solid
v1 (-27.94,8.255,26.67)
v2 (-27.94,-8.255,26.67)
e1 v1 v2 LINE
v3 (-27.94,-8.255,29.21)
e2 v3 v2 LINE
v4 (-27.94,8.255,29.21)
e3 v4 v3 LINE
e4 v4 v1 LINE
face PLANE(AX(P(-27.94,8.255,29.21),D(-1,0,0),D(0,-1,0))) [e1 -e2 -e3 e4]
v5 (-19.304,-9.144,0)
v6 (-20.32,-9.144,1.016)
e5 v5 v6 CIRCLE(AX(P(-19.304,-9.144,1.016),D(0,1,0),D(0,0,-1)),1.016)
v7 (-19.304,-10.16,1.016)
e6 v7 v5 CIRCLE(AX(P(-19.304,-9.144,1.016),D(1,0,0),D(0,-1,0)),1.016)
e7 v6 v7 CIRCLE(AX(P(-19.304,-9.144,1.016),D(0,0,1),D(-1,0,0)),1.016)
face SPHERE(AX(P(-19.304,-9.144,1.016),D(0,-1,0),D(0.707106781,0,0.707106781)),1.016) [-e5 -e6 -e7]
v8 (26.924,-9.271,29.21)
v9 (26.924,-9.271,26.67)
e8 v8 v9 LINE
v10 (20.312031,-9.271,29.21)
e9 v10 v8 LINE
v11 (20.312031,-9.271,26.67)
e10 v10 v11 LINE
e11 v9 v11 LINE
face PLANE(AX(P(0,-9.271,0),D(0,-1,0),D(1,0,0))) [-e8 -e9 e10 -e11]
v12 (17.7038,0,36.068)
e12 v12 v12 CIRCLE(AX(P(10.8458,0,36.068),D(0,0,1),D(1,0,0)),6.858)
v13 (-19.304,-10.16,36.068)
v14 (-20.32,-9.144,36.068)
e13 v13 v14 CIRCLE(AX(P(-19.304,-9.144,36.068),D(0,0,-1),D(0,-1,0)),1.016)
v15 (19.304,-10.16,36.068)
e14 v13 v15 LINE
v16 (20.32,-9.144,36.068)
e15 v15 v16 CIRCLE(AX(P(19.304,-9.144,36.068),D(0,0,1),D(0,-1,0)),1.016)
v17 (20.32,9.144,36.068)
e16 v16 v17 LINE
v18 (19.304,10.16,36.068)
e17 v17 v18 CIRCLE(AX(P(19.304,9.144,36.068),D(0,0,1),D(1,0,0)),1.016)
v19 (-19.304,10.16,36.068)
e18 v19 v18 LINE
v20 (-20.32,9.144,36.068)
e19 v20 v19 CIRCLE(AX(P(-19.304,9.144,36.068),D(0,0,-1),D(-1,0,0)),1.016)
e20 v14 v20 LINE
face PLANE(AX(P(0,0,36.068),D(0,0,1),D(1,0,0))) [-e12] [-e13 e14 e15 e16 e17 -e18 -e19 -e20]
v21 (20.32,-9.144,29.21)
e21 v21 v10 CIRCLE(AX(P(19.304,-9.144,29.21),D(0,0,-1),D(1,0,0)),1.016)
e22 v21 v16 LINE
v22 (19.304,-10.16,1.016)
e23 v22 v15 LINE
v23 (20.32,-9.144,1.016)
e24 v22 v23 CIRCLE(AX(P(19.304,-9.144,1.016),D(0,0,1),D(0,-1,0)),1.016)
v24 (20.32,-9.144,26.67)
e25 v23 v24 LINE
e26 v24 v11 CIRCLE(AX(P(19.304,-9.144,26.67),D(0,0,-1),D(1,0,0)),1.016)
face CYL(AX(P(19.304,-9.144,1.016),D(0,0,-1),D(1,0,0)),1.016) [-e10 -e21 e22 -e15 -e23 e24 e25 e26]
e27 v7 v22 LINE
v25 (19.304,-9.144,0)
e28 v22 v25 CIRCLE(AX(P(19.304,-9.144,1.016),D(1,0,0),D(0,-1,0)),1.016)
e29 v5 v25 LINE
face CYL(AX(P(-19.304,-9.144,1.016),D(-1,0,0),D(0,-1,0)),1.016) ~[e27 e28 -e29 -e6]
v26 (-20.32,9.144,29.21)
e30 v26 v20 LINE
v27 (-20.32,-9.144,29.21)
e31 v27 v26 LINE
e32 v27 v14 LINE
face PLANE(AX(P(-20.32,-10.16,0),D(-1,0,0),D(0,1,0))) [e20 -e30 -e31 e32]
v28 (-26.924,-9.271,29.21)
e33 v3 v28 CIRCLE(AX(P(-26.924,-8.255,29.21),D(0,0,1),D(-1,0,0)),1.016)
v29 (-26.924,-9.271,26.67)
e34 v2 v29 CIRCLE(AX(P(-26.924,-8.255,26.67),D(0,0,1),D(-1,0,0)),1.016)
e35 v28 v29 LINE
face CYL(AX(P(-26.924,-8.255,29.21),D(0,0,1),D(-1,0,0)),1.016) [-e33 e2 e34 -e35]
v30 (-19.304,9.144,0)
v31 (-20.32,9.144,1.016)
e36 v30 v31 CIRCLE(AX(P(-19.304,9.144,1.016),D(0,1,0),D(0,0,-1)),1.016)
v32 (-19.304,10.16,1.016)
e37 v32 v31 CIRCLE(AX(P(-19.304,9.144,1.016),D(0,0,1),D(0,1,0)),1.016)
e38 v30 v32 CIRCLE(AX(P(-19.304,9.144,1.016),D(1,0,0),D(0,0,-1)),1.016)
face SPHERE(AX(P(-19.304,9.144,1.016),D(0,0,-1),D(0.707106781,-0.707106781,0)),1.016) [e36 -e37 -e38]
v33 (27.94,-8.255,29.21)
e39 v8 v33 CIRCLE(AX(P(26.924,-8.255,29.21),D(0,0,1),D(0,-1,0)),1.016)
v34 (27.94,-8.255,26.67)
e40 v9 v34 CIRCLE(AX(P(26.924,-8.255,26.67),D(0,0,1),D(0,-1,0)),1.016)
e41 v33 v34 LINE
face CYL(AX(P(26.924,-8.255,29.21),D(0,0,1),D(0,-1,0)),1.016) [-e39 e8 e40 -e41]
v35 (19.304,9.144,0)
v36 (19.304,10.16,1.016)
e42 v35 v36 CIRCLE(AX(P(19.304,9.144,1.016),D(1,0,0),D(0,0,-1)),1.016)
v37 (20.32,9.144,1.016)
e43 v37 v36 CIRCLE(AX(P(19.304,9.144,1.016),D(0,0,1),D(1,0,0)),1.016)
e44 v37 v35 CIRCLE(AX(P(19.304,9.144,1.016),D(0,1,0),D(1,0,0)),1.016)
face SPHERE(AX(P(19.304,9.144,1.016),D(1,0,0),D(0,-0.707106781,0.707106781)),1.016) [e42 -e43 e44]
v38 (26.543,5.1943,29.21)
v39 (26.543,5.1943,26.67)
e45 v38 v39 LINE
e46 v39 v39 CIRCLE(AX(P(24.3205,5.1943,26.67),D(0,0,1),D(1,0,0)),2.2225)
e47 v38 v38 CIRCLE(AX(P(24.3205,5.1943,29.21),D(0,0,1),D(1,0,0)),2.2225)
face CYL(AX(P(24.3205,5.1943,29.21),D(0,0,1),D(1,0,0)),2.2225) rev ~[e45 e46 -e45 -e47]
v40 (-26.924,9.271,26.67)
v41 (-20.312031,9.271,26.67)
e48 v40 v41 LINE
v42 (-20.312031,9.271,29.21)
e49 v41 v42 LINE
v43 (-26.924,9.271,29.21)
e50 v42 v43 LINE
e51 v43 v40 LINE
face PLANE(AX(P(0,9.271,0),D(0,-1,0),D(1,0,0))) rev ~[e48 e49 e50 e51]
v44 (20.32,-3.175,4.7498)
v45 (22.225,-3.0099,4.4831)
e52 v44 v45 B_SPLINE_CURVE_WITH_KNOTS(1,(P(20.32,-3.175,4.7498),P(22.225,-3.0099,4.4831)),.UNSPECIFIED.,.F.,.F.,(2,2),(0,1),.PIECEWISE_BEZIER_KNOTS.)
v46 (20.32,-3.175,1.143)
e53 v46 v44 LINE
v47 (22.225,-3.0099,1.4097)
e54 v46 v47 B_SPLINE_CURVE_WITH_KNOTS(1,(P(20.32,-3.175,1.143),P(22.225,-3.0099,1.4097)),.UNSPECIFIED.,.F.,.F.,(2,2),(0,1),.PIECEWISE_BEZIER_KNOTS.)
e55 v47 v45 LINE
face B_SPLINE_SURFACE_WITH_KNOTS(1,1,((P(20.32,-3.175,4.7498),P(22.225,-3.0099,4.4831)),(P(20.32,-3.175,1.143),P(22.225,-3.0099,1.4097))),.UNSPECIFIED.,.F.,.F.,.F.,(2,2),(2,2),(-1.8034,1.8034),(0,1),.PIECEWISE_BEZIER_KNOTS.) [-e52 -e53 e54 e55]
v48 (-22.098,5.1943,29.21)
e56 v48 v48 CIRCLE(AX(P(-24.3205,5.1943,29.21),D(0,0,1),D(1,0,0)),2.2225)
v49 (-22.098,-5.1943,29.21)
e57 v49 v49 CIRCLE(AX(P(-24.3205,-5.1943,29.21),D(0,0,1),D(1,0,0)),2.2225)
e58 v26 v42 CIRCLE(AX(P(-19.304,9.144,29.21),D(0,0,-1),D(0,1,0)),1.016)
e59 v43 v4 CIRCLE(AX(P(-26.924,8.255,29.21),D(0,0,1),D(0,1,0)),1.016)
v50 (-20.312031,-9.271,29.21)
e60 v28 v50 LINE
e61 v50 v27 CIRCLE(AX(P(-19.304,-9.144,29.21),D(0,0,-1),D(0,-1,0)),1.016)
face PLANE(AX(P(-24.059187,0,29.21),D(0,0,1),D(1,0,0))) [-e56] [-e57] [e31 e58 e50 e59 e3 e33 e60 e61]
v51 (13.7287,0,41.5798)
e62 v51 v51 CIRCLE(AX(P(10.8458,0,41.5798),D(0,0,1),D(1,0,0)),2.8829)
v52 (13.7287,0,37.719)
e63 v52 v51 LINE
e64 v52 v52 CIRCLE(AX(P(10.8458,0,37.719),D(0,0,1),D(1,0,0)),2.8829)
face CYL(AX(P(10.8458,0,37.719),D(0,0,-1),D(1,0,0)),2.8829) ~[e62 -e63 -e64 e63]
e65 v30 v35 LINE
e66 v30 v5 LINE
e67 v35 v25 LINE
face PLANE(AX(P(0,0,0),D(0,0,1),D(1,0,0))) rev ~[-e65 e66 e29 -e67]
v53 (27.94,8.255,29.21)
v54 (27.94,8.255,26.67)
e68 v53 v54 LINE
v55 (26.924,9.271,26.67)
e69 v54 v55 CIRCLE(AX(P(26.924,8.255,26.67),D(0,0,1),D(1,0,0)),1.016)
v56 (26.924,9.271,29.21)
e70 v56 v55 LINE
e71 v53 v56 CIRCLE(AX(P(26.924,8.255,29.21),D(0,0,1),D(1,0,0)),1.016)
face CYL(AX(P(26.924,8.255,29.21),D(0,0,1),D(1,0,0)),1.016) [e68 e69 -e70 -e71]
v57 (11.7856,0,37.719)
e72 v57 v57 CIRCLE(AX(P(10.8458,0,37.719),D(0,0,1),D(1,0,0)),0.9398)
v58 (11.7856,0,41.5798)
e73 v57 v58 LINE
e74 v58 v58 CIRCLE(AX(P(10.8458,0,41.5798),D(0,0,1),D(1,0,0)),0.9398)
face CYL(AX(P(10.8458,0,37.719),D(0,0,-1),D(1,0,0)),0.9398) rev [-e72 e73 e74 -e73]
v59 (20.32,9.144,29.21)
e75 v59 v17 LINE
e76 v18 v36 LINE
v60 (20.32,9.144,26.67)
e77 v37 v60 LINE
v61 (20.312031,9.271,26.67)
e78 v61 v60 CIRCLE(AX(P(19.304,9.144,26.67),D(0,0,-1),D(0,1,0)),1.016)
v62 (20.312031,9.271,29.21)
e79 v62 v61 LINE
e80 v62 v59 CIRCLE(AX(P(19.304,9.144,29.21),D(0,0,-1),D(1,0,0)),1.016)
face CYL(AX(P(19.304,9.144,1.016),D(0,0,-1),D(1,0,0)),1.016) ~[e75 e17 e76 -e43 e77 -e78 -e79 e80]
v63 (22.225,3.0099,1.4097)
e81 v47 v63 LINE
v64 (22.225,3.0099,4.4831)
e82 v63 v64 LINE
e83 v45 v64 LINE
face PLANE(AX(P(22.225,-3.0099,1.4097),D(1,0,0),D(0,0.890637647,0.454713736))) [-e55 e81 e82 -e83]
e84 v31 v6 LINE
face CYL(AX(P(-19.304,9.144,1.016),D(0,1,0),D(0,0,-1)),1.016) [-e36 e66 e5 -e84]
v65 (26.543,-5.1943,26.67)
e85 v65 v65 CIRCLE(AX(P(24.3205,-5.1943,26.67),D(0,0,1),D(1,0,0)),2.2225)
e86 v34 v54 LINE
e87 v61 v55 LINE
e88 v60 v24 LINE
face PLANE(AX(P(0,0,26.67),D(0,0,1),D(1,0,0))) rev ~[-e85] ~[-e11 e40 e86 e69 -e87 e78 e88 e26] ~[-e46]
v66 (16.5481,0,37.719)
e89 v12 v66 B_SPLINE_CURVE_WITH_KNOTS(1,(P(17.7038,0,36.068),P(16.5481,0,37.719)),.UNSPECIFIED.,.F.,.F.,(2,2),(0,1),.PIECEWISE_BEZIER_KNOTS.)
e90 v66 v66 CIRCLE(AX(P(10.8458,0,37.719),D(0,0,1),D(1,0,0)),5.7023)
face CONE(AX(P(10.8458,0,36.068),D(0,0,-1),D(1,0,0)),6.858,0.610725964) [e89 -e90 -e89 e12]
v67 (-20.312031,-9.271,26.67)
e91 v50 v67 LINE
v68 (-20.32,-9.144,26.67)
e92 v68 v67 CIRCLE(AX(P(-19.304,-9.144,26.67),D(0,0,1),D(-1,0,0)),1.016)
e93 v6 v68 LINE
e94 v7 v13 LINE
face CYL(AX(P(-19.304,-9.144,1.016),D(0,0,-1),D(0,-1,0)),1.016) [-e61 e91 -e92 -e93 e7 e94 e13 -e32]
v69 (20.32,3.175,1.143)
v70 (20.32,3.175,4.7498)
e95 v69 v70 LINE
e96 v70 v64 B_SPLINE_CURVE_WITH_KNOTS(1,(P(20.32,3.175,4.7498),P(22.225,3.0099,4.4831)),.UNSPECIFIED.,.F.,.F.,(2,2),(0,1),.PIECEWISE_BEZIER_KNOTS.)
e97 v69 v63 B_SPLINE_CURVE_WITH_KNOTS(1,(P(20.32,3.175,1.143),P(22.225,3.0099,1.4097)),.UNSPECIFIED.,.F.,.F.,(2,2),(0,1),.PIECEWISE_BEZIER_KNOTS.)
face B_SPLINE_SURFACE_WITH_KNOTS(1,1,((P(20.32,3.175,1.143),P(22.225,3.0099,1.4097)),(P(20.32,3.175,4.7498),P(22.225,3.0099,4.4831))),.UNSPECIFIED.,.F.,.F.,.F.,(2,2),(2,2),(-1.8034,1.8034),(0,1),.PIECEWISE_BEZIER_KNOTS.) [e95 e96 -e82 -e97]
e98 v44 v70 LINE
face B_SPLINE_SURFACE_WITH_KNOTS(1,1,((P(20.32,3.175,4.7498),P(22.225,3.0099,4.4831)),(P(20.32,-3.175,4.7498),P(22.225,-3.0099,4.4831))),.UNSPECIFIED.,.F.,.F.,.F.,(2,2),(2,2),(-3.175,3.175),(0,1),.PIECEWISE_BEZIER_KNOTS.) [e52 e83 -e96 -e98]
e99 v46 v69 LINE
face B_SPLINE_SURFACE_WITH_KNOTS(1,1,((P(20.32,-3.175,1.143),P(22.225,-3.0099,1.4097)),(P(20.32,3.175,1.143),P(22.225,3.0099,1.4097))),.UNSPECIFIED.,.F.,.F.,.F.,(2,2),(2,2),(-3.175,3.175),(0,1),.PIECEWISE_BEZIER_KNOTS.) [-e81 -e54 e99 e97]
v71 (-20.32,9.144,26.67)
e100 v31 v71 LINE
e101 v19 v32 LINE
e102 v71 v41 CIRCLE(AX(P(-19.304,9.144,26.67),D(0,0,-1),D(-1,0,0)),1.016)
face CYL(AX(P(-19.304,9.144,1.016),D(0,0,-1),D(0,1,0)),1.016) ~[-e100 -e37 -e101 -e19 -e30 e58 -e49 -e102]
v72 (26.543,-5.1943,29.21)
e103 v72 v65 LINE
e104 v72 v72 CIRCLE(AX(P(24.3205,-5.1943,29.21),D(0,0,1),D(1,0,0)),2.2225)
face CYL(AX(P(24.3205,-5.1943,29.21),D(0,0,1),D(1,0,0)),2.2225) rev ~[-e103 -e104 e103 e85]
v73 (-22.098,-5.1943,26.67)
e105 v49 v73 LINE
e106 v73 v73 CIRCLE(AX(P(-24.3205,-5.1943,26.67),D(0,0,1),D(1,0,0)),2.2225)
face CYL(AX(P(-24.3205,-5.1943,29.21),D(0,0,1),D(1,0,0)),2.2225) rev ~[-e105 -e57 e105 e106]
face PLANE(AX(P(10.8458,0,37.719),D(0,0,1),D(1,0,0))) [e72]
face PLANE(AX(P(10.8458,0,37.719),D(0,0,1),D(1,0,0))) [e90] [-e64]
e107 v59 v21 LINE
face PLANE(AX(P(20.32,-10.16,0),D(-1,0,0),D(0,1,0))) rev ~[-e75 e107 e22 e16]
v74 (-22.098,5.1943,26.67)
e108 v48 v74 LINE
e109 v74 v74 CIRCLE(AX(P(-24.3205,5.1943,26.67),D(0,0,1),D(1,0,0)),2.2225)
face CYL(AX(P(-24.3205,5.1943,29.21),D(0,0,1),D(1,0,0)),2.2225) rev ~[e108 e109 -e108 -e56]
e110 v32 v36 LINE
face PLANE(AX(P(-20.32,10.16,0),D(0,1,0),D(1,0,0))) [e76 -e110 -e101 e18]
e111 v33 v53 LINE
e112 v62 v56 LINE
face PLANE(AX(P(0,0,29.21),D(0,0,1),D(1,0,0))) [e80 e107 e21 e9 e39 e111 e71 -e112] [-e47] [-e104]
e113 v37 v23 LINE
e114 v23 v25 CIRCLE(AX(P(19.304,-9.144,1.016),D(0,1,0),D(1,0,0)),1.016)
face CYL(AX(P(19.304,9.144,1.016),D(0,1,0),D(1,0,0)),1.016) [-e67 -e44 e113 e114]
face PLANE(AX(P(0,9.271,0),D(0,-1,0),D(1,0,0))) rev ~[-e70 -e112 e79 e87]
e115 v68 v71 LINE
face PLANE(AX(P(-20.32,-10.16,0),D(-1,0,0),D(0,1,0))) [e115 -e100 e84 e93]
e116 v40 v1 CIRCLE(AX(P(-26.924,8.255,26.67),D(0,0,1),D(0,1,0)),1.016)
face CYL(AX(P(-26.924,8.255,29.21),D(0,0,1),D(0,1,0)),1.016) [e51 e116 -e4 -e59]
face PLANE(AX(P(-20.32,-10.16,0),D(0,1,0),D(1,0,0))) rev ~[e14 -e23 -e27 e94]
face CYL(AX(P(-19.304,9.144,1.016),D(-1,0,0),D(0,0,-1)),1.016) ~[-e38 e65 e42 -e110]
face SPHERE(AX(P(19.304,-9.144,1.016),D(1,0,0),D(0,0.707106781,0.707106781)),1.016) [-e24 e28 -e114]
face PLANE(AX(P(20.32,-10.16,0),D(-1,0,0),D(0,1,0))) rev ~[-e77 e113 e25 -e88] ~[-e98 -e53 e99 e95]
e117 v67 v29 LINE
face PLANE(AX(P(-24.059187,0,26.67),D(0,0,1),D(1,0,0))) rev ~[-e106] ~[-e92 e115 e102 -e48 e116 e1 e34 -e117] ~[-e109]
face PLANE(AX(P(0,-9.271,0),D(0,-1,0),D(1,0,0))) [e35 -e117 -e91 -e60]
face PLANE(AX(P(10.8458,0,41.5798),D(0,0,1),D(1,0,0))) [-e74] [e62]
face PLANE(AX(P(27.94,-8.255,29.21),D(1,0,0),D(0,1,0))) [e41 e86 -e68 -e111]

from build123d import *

# Parameters (mm, degrees)
F0_W           = 40.64
F0_H           = 20.32
F1_DEPTH       = 36.068
F2_W           = 6.35
F2_H           = 3.6068
F4_W           = 6.0198
F4_H           = 3.0734
F7_R           = 2.2225
F8_DEPTH       = 2.54
F9_R           = 6.858
F11_R          = 5.7023
F13_T1_DEPTH   = 38.608
F13_T3_DEPTH   = 18.288
F13_S7_W       = 1.016
F13_S7_H       = 1.016
F13_T8_DEPTH   = 1.016
F13_S13_W      = 1.016
F13_S13_H      = 1.016
F13_T14_DEPTH  = 1.016
F13_S19_W      = 1.016
F13_S19_H      = 1.016
F13_T20_DEPTH  = 1.016
F13_S25_W      = 1.016
F13_S25_H      = 1.016
F13_T26_DEPTH  = 1.016
F13_T32_DEPTH  = 37.592
F13_T38_DEPTH  = 37.592
F13_T44_DEPTH  = 37.592
F13_T51_DEPTH  = 37.592
F13_T57_DEPTH  = 37.592
F13_T63_DEPTH  = 37.592
F13_T69_DEPTH  = 37.592
F13_T75_DEPTH  = 37.592
F13_T82_DEPTH  = 37.592
F13_T88_DEPTH  = 37.592
F13_T94_DEPTH  = 37.592
F13_T100_DEPTH = 37.592
F13_T106_DEPTH = 37.592
F13_T113_DEPTH = 37.592
F13_T119_DEPTH = 37.592
F13_T125_DEPTH = 37.592
F13_T131_DEPTH = 37.592
F13_T137_DEPTH = 37.592
F13_T144_DEPTH = 37.592
F13_T150_DEPTH = 37.592
F14_R          = 2.8829
F14_R_2        = 0.9398
F15_DEPTH      = 3.8608


# Not quite as in the source:
# - a fillet or chamfer that OpenCascade refuses, or shapes differently, is made with other operations: its cross-section is extruded or revolved along the edge and cut away or added


with BuildPart() as f1:
    # F0 (on Top) → F1 (new body)
    with BuildSketch(Plane.XY):
        Rectangle(F0_W, F0_H)
    extrude(amount=F1_DEPTH)

    # F2 (on face) → F5 section 0
    with BuildSketch(Plane.YZ.offset(20.32)):
        with Locations((0, 2.9464)):
            Rectangle(F2_W, F2_H)
    # F4 (on offset) → F5 section 1
    with BuildSketch(Plane.YZ.offset(22.225)):
        with Locations((0, 2.9464)):
            Rectangle(F4_W, F4_H)
    loft()

    # F7 (on offset) → F8 (join)
    with BuildSketch(Plane.XY.offset(29.21)):
        with BuildLine():
            ThreePointArc((-27.94, -8.255), (-27.6424204897, -8.9734204897), (-26.924, -9.271))
            Line((-26.924, -9.271), (-20.32, -9.271))
            Line((-20.32, -9.271), (-20.32, 9.271))
            Line((-20.32, 9.271), (-26.924, 9.271))
            ThreePointArc((-26.924, 9.271), (-27.6424204897, 8.9734204897), (-27.94, 8.255))
            Line((-27.94, 8.255), (-27.94, -8.255))
        make_face()
        with Locations((-24.3205, -5.1943)):
            Circle(F7_R, mode=Mode.SUBTRACT)
        with Locations((-24.3205, 5.1943)):
            Circle(F7_R, mode=Mode.SUBTRACT)
        with BuildLine():
            ThreePointArc((27.94, 8.255), (27.6424204897, 8.9734204897), (26.924, 9.271))
            Line((26.924, 9.271), (20.32, 9.271))
            Line((20.32, 9.271), (20.32, -9.271))
            Line((20.32, -9.271), (26.924, -9.271))
            ThreePointArc((26.924, -9.271), (27.6424204897, -8.9734204897), (27.94, -8.255))
            Line((27.94, -8.255), (27.94, 8.255))
        make_face()
        with Locations((24.3205, -5.1943)):
            Circle(F7_R, mode=Mode.SUBTRACT)
        with Locations((24.3205, 5.1943)):
            Circle(F7_R, mode=Mode.SUBTRACT)
    extrude(amount=-F8_DEPTH)

    # F9 (on face) → F12 section 0
    with BuildSketch(Plane.XY.offset(36.068)):
        with Locations((10.8458, 0)):
            Circle(F9_R)
    # F11 (on offset) → F12 section 1
    with BuildSketch(Plane.XY.offset(37.719)):
        with Locations((10.8458, 0)):
            Circle(F11_R)
    loft()

    # F13: fillet of radius 1.016 on 8 edges, made by hand

    # F13_s2 → F13_t1 (cut)
    with BuildSketch(Plane.YZ.offset(-19.304)):
        with BuildLine():
            ThreePointArc((-10.16, 1.016), (-9.8624204897, 0.2975795103), (-9.144, 0))
            Line((-9.144, 0), (-10.16, 0))
            Line((-10.16, 0), (-10.16, 1.016))
        make_face()
        with BuildLine():
            ThreePointArc((9.144, 0), (9.8624204897, 0.2975795103), (10.16, 1.016))
            Line((10.16, 1.016), (10.16, 0))
            Line((10.16, 0), (9.144, 0))
        make_face()
    extrude(amount=F13_T1_DEPTH, mode=Mode.SUBTRACT)

    # F13_s4 → F13_t3 (cut)
    with BuildSketch(Plane.XZ.offset(-9.144)):
        with BuildLine():
            ThreePointArc((20.32, 1.016), (20.0224204897, 0.2975795103), (19.304, 0))
            Line((19.304, 0), (20.32, 0))
            Line((20.32, 0), (20.32, 1.016))
        make_face()
        with BuildLine():
            ThreePointArc((-19.304, 0), (-20.0224204897, 0.2975795103), (-20.32, 1.016))
            Line((-20.32, 1.016), (-20.32, 0))
            Line((-20.32, 0), (-19.304, 0))
        make_face()
    extrude(amount=F13_T3_DEPTH, mode=Mode.SUBTRACT)


with BuildPart() as f13_tool6:
    # F13_s7 → F13_t8 (new body)
    with BuildSketch(Plane.YZ.offset(19.304)):
        with Locations((-9.652, 0.508)):
            Rectangle(F13_S7_W, F13_S7_H)
    extrude(amount=F13_T8_DEPTH)

    # F13_s9 → F13_t10 (revolve, cut)
    with BuildSketch(Plane(origin=(19.304, -9.144, 1.016), x_dir=(0, 0.7071067812, 0.7071067812), z_dir=(0, 0.7071067812, -0.7071067812))):
        with BuildLine():
            ThreePointArc((0, -1.016), (1.016, 0), (0, 1.016))
            Line((0, 1.016), (0, -1.016))
        make_face()
    revolve(axis=Axis((19.304, -9.144, 1.016), (1, 0, 0)), mode=Mode.SUBTRACT)


with BuildPart() as f1_1:
    add(f1.part)

    # F13_t5: cut F13_tool6
    add(f13_tool6.part, mode=Mode.SUBTRACT)


with BuildPart() as f13_tool12:
    # F13_s13 → F13_t14 (new body)
    with BuildSketch(Plane.YZ.offset(19.304)):
        with Locations((9.652, 0.508)):
            Rectangle(F13_S13_W, F13_S13_H)
    extrude(amount=F13_T14_DEPTH)

    # F13_s15 → F13_t16 (revolve, cut)
    with BuildSketch(Plane(origin=(19.304, 9.144, 1.016), x_dir=(0, -0.7071067812, 0.7071067812), z_dir=(0, 0.7071067812, 0.7071067812))):
        with BuildLine():
            ThreePointArc((0, -1.016), (1.016, 0), (0, 1.016))
            Line((0, 1.016), (0, -1.016))
        make_face()
    revolve(axis=Axis((19.304, 9.144, 1.016), (1, 0, 0)), mode=Mode.SUBTRACT)


with BuildPart() as f1_2:
    add(f1_1.part)

    # F13_t11: cut F13_tool12
    add(f13_tool12.part, mode=Mode.SUBTRACT)


with BuildPart() as f13_tool18:
    # F13_s19 → F13_t20 (new body)
    with BuildSketch(Plane.XY.offset(1.016)):
        with Locations((-19.812, 9.652)):
            Rectangle(F13_S19_W, F13_S19_H)
    extrude(amount=-F13_T20_DEPTH)

    # F13_s21 → F13_t22 (revolve, cut)
    with BuildSketch(Plane(origin=(-19.304, 9.144, 1.016), x_dir=(0.7071067812, -0.7071067812, 0), z_dir=(0.7071067812, 0.7071067812, 0))):
        with BuildLine():
            ThreePointArc((0, -1.016), (1.016, 0), (0, 1.016))
            Line((0, 1.016), (0, -1.016))
        make_face()
    revolve(axis=Axis((-19.304, 9.144, 1.016), (0, 0, -1)), mode=Mode.SUBTRACT)


with BuildPart() as f1_3:
    add(f1_2.part)

    # F13_t17: cut F13_tool18
    add(f13_tool18.part, mode=Mode.SUBTRACT)


with BuildPart() as f13_tool24:
    # F13_s25 → F13_t26 (new body)
    with BuildSketch(Plane.XZ.offset(9.144)):
        with Locations((-19.812, 0.508)):
            Rectangle(F13_S25_W, F13_S25_H)
    extrude(amount=F13_T26_DEPTH)

    # F13_s27 → F13_t28 (revolve, cut)
    with BuildSketch(Plane(origin=(-19.304, -9.144, 1.016), x_dir=(0.7071067812, 0, 0.7071067812), z_dir=(0.7071067812, 0, -0.7071067812))):
        with BuildLine():
            ThreePointArc((0, -1.016), (1.016, 0), (0, 1.016))
            Line((0, 1.016), (0, -1.016))
        make_face()
    revolve(axis=Axis((-19.304, -9.144, 1.016), (0, -1, 0)), mode=Mode.SUBTRACT)


with BuildPart() as f1_4:
    add(f1_3.part)

    # F13_t23: cut F13_tool24
    add(f13_tool24.part, mode=Mode.SUBTRACT)


with BuildPart() as f13_tool30:
    # F13_s31 → F13_t32 (new body)
    with BuildSketch(Plane.XY.offset(1.016)):
        with BuildLine():
            ThreePointArc((20.32, -9.144), (20.0224204897, -9.8624204897), (19.304, -10.16))
            Line((19.304, -10.16), (20.32, -10.16))
            Line((20.32, -10.16), (20.32, -9.144))
        make_face()
    extrude(amount=F13_T32_DEPTH)

    split(bisect_by=Plane.XY.offset(26.67), keep=Keep.BOTTOM)

    split(bisect_by=Plane.XZ.offset(9.271), keep=Keep.BOTTOM)


with BuildPart() as f1_5:
    add(f1_4.part)

    # F13_t29: cut F13_tool30
    add(f13_tool30.part, mode=Mode.SUBTRACT)


with BuildPart() as f13_tool36:
    # F13_s37 → F13_t38 (new body)
    with BuildSketch(Plane.XY.offset(1.016)):
        with BuildLine():
            ThreePointArc((20.32, -9.144), (20.0224204897, -9.8624204897), (19.304, -10.16))
            Line((19.304, -10.16), (20.32, -10.16))
            Line((20.32, -10.16), (20.32, -9.144))
        make_face()
    extrude(amount=F13_T38_DEPTH)

    split(bisect_by=Plane.XY.offset(26.67), keep=Keep.BOTTOM)

    split(bisect_by=Plane.XZ.offset(9.271), keep=Keep.TOP)


with BuildPart() as f1_6:
    add(f1_5.part)

    # F13_t35: cut F13_tool36
    add(f13_tool36.part, mode=Mode.SUBTRACT)


with BuildPart() as f13_tool42:
    # F13_s43 → F13_t44 (new body)
    with BuildSketch(Plane.XY.offset(1.016)):
        with BuildLine():
            ThreePointArc((20.32, -9.144), (20.0224204897, -9.8624204897), (19.304, -10.16))
            Line((19.304, -10.16), (20.32, -10.16))
            Line((20.32, -10.16), (20.32, -9.144))
        make_face()
    extrude(amount=F13_T44_DEPTH)

    split(bisect_by=Plane.XY.offset(26.67), keep=Keep.TOP)

    split(bisect_by=Plane.XZ.offset(9.271), keep=Keep.TOP)

    split(bisect_by=Plane.XY.offset(29.21), keep=Keep.BOTTOM)


with BuildPart() as f1_7:
    add(f1_6.part)

    # F13_t41: cut F13_tool42
    add(f13_tool42.part, mode=Mode.SUBTRACT)


with BuildPart() as f13_tool49:
    # F13_s50 → F13_t51 (new body)
    with BuildSketch(Plane.XY.offset(1.016)):
        with BuildLine():
            ThreePointArc((20.32, -9.144), (20.0224204897, -9.8624204897), (19.304, -10.16))
            Line((19.304, -10.16), (20.32, -10.16))
            Line((20.32, -10.16), (20.32, -9.144))
        make_face()
    extrude(amount=F13_T51_DEPTH)

    split(bisect_by=Plane.XZ.offset(9.271), keep=Keep.BOTTOM)

    split(bisect_by=Plane.XY.offset(29.21), keep=Keep.TOP)


with BuildPart() as f1_8:
    add(f1_7.part)

    # F13_t48: cut F13_tool49
    add(f13_tool49.part, mode=Mode.SUBTRACT)


with BuildPart() as f13_tool55:
    # F13_s56 → F13_t57 (new body)
    with BuildSketch(Plane.XY.offset(1.016)):
        with BuildLine():
            ThreePointArc((20.32, -9.144), (20.0224204897, -9.8624204897), (19.304, -10.16))
            Line((19.304, -10.16), (20.32, -10.16))
            Line((20.32, -10.16), (20.32, -9.144))
        make_face()
    extrude(amount=F13_T57_DEPTH)

    split(bisect_by=Plane.XZ.offset(9.271), keep=Keep.TOP)

    split(bisect_by=Plane.XY.offset(29.21), keep=Keep.TOP)


with BuildPart() as f1_9:
    add(f1_8.part)

    # F13_t54: cut F13_tool55
    add(f13_tool55.part, mode=Mode.SUBTRACT)


with BuildPart() as f13_tool61:
    # F13_s62 → F13_t63 (new body)
    with BuildSketch(Plane.XY.offset(1.016)):
        with BuildLine():
            ThreePointArc((20.32, 9.144), (20.0224204897, 9.8624204897), (19.304, 10.16))
            Line((19.304, 10.16), (20.32, 10.16))
            Line((20.32, 10.16), (20.32, 9.144))
        make_face()
    extrude(amount=F13_T63_DEPTH)

    split(bisect_by=Plane.XZ.offset(-9.271), keep=Keep.TOP)

    split(bisect_by=Plane.XY.offset(26.67), keep=Keep.BOTTOM)


with BuildPart() as f1_10:
    add(f1_9.part)

    # F13_t60: cut F13_tool61
    add(f13_tool61.part, mode=Mode.SUBTRACT)


with BuildPart() as f13_tool67:
    # F13_s68 → F13_t69 (new body)
    with BuildSketch(Plane.XY.offset(1.016)):
        with BuildLine():
            ThreePointArc((20.32, 9.144), (20.0224204897, 9.8624204897), (19.304, 10.16))
            Line((19.304, 10.16), (20.32, 10.16))
            Line((20.32, 10.16), (20.32, 9.144))
        make_face()
    extrude(amount=F13_T69_DEPTH)

    split(bisect_by=Plane.XZ.offset(-9.271), keep=Keep.BOTTOM)

    split(bisect_by=Plane.XY.offset(26.67), keep=Keep.BOTTOM)


with BuildPart() as f1_11:
    add(f1_10.part)

    # F13_t66: cut F13_tool67
    add(f13_tool67.part, mode=Mode.SUBTRACT)


with BuildPart() as f13_tool73:
    # F13_s74 → F13_t75 (new body)
    with BuildSketch(Plane.XY.offset(1.016)):
        with BuildLine():
            ThreePointArc((20.32, 9.144), (20.0224204897, 9.8624204897), (19.304, 10.16))
            Line((19.304, 10.16), (20.32, 10.16))
            Line((20.32, 10.16), (20.32, 9.144))
        make_face()
    extrude(amount=F13_T75_DEPTH)

    split(bisect_by=Plane.XZ.offset(-9.271), keep=Keep.BOTTOM)

    split(bisect_by=Plane.XY.offset(26.67), keep=Keep.TOP)

    split(bisect_by=Plane.XY.offset(29.21), keep=Keep.BOTTOM)


with BuildPart() as f1_12:
    add(f1_11.part)

    # F13_t72: cut F13_tool73
    add(f13_tool73.part, mode=Mode.SUBTRACT)


with BuildPart() as f13_tool80:
    # F13_s81 → F13_t82 (new body)
    with BuildSketch(Plane.XY.offset(1.016)):
        with BuildLine():
            ThreePointArc((20.32, 9.144), (20.0224204897, 9.8624204897), (19.304, 10.16))
            Line((19.304, 10.16), (20.32, 10.16))
            Line((20.32, 10.16), (20.32, 9.144))
        make_face()
    extrude(amount=F13_T82_DEPTH)

    split(bisect_by=Plane.XZ.offset(-9.271), keep=Keep.TOP)

    split(bisect_by=Plane.XY.offset(29.21), keep=Keep.TOP)


with BuildPart() as f1_13:
    add(f1_12.part)

    # F13_t79: cut F13_tool80
    add(f13_tool80.part, mode=Mode.SUBTRACT)


with BuildPart() as f13_tool86:
    # F13_s87 → F13_t88 (new body)
    with BuildSketch(Plane.XY.offset(1.016)):
        with BuildLine():
            ThreePointArc((20.32, 9.144), (20.0224204897, 9.8624204897), (19.304, 10.16))
            Line((19.304, 10.16), (20.32, 10.16))
            Line((20.32, 10.16), (20.32, 9.144))
        make_face()
    extrude(amount=F13_T88_DEPTH)

    split(bisect_by=Plane.XZ.offset(-9.271), keep=Keep.BOTTOM)

    split(bisect_by=Plane.XY.offset(29.21), keep=Keep.TOP)


with BuildPart() as f1_14:
    add(f1_13.part)

    # F13_t85: cut F13_tool86
    add(f13_tool86.part, mode=Mode.SUBTRACT)


with BuildPart() as f13_tool92:
    # F13_s93 → F13_t94 (new body)
    with BuildSketch(Plane.XY.offset(1.016)):
        with BuildLine():
            ThreePointArc((-19.304, 10.16), (-20.0224204897, 9.8624204897), (-20.32, 9.144))
            Line((-20.32, 9.144), (-20.32, 10.16))
            Line((-20.32, 10.16), (-19.304, 10.16))
        make_face()
    extrude(amount=F13_T94_DEPTH)

    split(bisect_by=Plane.XY.offset(26.67), keep=Keep.BOTTOM)

    split(bisect_by=Plane.XZ.offset(-9.271), keep=Keep.BOTTOM)


with BuildPart() as f1_15:
    add(f1_14.part)

    # F13_t91: cut F13_tool92
    add(f13_tool92.part, mode=Mode.SUBTRACT)


with BuildPart() as f13_tool98:
    # F13_s99 → F13_t100 (new body)
    with BuildSketch(Plane.XY.offset(1.016)):
        with BuildLine():
            ThreePointArc((-19.304, 10.16), (-20.0224204897, 9.8624204897), (-20.32, 9.144))
            Line((-20.32, 9.144), (-20.32, 10.16))
            Line((-20.32, 10.16), (-19.304, 10.16))
        make_face()
    extrude(amount=F13_T100_DEPTH)

    split(bisect_by=Plane.XY.offset(26.67), keep=Keep.BOTTOM)

    split(bisect_by=Plane.XZ.offset(-9.271), keep=Keep.TOP)


with BuildPart() as f1_16:
    add(f1_15.part)

    # F13_t97: cut F13_tool98
    add(f13_tool98.part, mode=Mode.SUBTRACT)


with BuildPart() as f13_tool104:
    # F13_s105 → F13_t106 (new body)
    with BuildSketch(Plane.XY.offset(1.016)):
        with BuildLine():
            ThreePointArc((-19.304, 10.16), (-20.0224204897, 9.8624204897), (-20.32, 9.144))
            Line((-20.32, 9.144), (-20.32, 10.16))
            Line((-20.32, 10.16), (-19.304, 10.16))
        make_face()
    extrude(amount=F13_T106_DEPTH)

    split(bisect_by=Plane.XY.offset(26.67), keep=Keep.TOP)

    split(bisect_by=Plane.XZ.offset(-9.271), keep=Keep.BOTTOM)

    split(bisect_by=Plane.XY.offset(29.21), keep=Keep.BOTTOM)


with BuildPart() as f1_17:
    add(f1_16.part)

    # F13_t103: cut F13_tool104
    add(f13_tool104.part, mode=Mode.SUBTRACT)


with BuildPart() as f13_tool111:
    # F13_s112 → F13_t113 (new body)
    with BuildSketch(Plane.XY.offset(1.016)):
        with BuildLine():
            ThreePointArc((-19.304, 10.16), (-20.0224204897, 9.8624204897), (-20.32, 9.144))
            Line((-20.32, 9.144), (-20.32, 10.16))
            Line((-20.32, 10.16), (-19.304, 10.16))
        make_face()
    extrude(amount=F13_T113_DEPTH)

    split(bisect_by=Plane.XZ.offset(-9.271), keep=Keep.BOTTOM)

    split(bisect_by=Plane.XY.offset(29.21), keep=Keep.TOP)


with BuildPart() as f1_18:
    add(f1_17.part)

    # F13_t110: cut F13_tool111
    add(f13_tool111.part, mode=Mode.SUBTRACT)


with BuildPart() as f13_tool117:
    # F13_s118 → F13_t119 (new body)
    with BuildSketch(Plane.XY.offset(1.016)):
        with BuildLine():
            ThreePointArc((-19.304, 10.16), (-20.0224204897, 9.8624204897), (-20.32, 9.144))
            Line((-20.32, 9.144), (-20.32, 10.16))
            Line((-20.32, 10.16), (-19.304, 10.16))
        make_face()
    extrude(amount=F13_T119_DEPTH)

    split(bisect_by=Plane.XZ.offset(-9.271), keep=Keep.TOP)

    split(bisect_by=Plane.XY.offset(29.21), keep=Keep.TOP)


with BuildPart() as f1_19:
    add(f1_18.part)

    # F13_t116: cut F13_tool117
    add(f13_tool117.part, mode=Mode.SUBTRACT)


with BuildPart() as f13_tool123:
    # F13_s124 → F13_t125 (new body)
    with BuildSketch(Plane.XY.offset(1.016)):
        with BuildLine():
            ThreePointArc((-19.304, -10.16), (-20.0224204897, -9.8624204897), (-20.32, -9.144))
            Line((-20.32, -9.144), (-20.32, -10.16))
            Line((-20.32, -10.16), (-19.304, -10.16))
        make_face()
    extrude(amount=F13_T125_DEPTH)

    split(bisect_by=Plane.XZ.offset(9.271), keep=Keep.TOP)

    split(bisect_by=Plane.XY.offset(26.67), keep=Keep.BOTTOM)


with BuildPart() as f1_20:
    add(f1_19.part)

    # F13_t122: cut F13_tool123
    add(f13_tool123.part, mode=Mode.SUBTRACT)


with BuildPart() as f13_tool129:
    # F13_s130 → F13_t131 (new body)
    with BuildSketch(Plane.XY.offset(1.016)):
        with BuildLine():
            ThreePointArc((-19.304, -10.16), (-20.0224204897, -9.8624204897), (-20.32, -9.144))
            Line((-20.32, -9.144), (-20.32, -10.16))
            Line((-20.32, -10.16), (-19.304, -10.16))
        make_face()
    extrude(amount=F13_T131_DEPTH)

    split(bisect_by=Plane.XZ.offset(9.271), keep=Keep.BOTTOM)

    split(bisect_by=Plane.XY.offset(26.67), keep=Keep.BOTTOM)


with BuildPart() as f1_21:
    add(f1_20.part)

    # F13_t128: cut F13_tool129
    add(f13_tool129.part, mode=Mode.SUBTRACT)


with BuildPart() as f13_tool135:
    # F13_s136 → F13_t137 (new body)
    with BuildSketch(Plane.XY.offset(1.016)):
        with BuildLine():
            ThreePointArc((-19.304, -10.16), (-20.0224204897, -9.8624204897), (-20.32, -9.144))
            Line((-20.32, -9.144), (-20.32, -10.16))
            Line((-20.32, -10.16), (-19.304, -10.16))
        make_face()
    extrude(amount=F13_T137_DEPTH)

    split(bisect_by=Plane.XZ.offset(9.271), keep=Keep.TOP)

    split(bisect_by=Plane.XY.offset(26.67), keep=Keep.TOP)

    split(bisect_by=Plane.XY.offset(29.21), keep=Keep.BOTTOM)


with BuildPart() as f1_22:
    add(f1_21.part)

    # F13_t134: cut F13_tool135
    add(f13_tool135.part, mode=Mode.SUBTRACT)


with BuildPart() as f13_tool142:
    # F13_s143 → F13_t144 (new body)
    with BuildSketch(Plane.XY.offset(1.016)):
        with BuildLine():
            ThreePointArc((-19.304, -10.16), (-20.0224204897, -9.8624204897), (-20.32, -9.144))
            Line((-20.32, -9.144), (-20.32, -10.16))
            Line((-20.32, -10.16), (-19.304, -10.16))
        make_face()
    extrude(amount=F13_T144_DEPTH)

    split(bisect_by=Plane.XZ.offset(9.271), keep=Keep.TOP)

    split(bisect_by=Plane.XY.offset(29.21), keep=Keep.TOP)


with BuildPart() as f1_23:
    add(f1_22.part)

    # F13_t141: cut F13_tool142
    add(f13_tool142.part, mode=Mode.SUBTRACT)


with BuildPart() as f13_tool148:
    # F13_s149 → F13_t150 (new body)
    with BuildSketch(Plane.XY.offset(1.016)):
        with BuildLine():
            ThreePointArc((-19.304, -10.16), (-20.0224204897, -9.8624204897), (-20.32, -9.144))
            Line((-20.32, -9.144), (-20.32, -10.16))
            Line((-20.32, -10.16), (-19.304, -10.16))
        make_face()
    extrude(amount=F13_T150_DEPTH)

    split(bisect_by=Plane.XZ.offset(9.271), keep=Keep.BOTTOM)

    split(bisect_by=Plane.XY.offset(29.21), keep=Keep.TOP)


with BuildPart() as f1_24:
    add(f1_23.part)

    # F13_t147: cut F13_tool148
    add(f13_tool148.part, mode=Mode.SUBTRACT)

    # F14 (on face) → F15 (join)
    with BuildSketch(Plane.XY.offset(37.719)):
        with Locations((10.8458, 0)):
            Circle(F14_R)
        with Locations((10.8458, 0)):
            Circle(F14_R_2, mode=Mode.SUBTRACT)
    extrude(amount=F15_DEPTH)


solid = f1_24.part
